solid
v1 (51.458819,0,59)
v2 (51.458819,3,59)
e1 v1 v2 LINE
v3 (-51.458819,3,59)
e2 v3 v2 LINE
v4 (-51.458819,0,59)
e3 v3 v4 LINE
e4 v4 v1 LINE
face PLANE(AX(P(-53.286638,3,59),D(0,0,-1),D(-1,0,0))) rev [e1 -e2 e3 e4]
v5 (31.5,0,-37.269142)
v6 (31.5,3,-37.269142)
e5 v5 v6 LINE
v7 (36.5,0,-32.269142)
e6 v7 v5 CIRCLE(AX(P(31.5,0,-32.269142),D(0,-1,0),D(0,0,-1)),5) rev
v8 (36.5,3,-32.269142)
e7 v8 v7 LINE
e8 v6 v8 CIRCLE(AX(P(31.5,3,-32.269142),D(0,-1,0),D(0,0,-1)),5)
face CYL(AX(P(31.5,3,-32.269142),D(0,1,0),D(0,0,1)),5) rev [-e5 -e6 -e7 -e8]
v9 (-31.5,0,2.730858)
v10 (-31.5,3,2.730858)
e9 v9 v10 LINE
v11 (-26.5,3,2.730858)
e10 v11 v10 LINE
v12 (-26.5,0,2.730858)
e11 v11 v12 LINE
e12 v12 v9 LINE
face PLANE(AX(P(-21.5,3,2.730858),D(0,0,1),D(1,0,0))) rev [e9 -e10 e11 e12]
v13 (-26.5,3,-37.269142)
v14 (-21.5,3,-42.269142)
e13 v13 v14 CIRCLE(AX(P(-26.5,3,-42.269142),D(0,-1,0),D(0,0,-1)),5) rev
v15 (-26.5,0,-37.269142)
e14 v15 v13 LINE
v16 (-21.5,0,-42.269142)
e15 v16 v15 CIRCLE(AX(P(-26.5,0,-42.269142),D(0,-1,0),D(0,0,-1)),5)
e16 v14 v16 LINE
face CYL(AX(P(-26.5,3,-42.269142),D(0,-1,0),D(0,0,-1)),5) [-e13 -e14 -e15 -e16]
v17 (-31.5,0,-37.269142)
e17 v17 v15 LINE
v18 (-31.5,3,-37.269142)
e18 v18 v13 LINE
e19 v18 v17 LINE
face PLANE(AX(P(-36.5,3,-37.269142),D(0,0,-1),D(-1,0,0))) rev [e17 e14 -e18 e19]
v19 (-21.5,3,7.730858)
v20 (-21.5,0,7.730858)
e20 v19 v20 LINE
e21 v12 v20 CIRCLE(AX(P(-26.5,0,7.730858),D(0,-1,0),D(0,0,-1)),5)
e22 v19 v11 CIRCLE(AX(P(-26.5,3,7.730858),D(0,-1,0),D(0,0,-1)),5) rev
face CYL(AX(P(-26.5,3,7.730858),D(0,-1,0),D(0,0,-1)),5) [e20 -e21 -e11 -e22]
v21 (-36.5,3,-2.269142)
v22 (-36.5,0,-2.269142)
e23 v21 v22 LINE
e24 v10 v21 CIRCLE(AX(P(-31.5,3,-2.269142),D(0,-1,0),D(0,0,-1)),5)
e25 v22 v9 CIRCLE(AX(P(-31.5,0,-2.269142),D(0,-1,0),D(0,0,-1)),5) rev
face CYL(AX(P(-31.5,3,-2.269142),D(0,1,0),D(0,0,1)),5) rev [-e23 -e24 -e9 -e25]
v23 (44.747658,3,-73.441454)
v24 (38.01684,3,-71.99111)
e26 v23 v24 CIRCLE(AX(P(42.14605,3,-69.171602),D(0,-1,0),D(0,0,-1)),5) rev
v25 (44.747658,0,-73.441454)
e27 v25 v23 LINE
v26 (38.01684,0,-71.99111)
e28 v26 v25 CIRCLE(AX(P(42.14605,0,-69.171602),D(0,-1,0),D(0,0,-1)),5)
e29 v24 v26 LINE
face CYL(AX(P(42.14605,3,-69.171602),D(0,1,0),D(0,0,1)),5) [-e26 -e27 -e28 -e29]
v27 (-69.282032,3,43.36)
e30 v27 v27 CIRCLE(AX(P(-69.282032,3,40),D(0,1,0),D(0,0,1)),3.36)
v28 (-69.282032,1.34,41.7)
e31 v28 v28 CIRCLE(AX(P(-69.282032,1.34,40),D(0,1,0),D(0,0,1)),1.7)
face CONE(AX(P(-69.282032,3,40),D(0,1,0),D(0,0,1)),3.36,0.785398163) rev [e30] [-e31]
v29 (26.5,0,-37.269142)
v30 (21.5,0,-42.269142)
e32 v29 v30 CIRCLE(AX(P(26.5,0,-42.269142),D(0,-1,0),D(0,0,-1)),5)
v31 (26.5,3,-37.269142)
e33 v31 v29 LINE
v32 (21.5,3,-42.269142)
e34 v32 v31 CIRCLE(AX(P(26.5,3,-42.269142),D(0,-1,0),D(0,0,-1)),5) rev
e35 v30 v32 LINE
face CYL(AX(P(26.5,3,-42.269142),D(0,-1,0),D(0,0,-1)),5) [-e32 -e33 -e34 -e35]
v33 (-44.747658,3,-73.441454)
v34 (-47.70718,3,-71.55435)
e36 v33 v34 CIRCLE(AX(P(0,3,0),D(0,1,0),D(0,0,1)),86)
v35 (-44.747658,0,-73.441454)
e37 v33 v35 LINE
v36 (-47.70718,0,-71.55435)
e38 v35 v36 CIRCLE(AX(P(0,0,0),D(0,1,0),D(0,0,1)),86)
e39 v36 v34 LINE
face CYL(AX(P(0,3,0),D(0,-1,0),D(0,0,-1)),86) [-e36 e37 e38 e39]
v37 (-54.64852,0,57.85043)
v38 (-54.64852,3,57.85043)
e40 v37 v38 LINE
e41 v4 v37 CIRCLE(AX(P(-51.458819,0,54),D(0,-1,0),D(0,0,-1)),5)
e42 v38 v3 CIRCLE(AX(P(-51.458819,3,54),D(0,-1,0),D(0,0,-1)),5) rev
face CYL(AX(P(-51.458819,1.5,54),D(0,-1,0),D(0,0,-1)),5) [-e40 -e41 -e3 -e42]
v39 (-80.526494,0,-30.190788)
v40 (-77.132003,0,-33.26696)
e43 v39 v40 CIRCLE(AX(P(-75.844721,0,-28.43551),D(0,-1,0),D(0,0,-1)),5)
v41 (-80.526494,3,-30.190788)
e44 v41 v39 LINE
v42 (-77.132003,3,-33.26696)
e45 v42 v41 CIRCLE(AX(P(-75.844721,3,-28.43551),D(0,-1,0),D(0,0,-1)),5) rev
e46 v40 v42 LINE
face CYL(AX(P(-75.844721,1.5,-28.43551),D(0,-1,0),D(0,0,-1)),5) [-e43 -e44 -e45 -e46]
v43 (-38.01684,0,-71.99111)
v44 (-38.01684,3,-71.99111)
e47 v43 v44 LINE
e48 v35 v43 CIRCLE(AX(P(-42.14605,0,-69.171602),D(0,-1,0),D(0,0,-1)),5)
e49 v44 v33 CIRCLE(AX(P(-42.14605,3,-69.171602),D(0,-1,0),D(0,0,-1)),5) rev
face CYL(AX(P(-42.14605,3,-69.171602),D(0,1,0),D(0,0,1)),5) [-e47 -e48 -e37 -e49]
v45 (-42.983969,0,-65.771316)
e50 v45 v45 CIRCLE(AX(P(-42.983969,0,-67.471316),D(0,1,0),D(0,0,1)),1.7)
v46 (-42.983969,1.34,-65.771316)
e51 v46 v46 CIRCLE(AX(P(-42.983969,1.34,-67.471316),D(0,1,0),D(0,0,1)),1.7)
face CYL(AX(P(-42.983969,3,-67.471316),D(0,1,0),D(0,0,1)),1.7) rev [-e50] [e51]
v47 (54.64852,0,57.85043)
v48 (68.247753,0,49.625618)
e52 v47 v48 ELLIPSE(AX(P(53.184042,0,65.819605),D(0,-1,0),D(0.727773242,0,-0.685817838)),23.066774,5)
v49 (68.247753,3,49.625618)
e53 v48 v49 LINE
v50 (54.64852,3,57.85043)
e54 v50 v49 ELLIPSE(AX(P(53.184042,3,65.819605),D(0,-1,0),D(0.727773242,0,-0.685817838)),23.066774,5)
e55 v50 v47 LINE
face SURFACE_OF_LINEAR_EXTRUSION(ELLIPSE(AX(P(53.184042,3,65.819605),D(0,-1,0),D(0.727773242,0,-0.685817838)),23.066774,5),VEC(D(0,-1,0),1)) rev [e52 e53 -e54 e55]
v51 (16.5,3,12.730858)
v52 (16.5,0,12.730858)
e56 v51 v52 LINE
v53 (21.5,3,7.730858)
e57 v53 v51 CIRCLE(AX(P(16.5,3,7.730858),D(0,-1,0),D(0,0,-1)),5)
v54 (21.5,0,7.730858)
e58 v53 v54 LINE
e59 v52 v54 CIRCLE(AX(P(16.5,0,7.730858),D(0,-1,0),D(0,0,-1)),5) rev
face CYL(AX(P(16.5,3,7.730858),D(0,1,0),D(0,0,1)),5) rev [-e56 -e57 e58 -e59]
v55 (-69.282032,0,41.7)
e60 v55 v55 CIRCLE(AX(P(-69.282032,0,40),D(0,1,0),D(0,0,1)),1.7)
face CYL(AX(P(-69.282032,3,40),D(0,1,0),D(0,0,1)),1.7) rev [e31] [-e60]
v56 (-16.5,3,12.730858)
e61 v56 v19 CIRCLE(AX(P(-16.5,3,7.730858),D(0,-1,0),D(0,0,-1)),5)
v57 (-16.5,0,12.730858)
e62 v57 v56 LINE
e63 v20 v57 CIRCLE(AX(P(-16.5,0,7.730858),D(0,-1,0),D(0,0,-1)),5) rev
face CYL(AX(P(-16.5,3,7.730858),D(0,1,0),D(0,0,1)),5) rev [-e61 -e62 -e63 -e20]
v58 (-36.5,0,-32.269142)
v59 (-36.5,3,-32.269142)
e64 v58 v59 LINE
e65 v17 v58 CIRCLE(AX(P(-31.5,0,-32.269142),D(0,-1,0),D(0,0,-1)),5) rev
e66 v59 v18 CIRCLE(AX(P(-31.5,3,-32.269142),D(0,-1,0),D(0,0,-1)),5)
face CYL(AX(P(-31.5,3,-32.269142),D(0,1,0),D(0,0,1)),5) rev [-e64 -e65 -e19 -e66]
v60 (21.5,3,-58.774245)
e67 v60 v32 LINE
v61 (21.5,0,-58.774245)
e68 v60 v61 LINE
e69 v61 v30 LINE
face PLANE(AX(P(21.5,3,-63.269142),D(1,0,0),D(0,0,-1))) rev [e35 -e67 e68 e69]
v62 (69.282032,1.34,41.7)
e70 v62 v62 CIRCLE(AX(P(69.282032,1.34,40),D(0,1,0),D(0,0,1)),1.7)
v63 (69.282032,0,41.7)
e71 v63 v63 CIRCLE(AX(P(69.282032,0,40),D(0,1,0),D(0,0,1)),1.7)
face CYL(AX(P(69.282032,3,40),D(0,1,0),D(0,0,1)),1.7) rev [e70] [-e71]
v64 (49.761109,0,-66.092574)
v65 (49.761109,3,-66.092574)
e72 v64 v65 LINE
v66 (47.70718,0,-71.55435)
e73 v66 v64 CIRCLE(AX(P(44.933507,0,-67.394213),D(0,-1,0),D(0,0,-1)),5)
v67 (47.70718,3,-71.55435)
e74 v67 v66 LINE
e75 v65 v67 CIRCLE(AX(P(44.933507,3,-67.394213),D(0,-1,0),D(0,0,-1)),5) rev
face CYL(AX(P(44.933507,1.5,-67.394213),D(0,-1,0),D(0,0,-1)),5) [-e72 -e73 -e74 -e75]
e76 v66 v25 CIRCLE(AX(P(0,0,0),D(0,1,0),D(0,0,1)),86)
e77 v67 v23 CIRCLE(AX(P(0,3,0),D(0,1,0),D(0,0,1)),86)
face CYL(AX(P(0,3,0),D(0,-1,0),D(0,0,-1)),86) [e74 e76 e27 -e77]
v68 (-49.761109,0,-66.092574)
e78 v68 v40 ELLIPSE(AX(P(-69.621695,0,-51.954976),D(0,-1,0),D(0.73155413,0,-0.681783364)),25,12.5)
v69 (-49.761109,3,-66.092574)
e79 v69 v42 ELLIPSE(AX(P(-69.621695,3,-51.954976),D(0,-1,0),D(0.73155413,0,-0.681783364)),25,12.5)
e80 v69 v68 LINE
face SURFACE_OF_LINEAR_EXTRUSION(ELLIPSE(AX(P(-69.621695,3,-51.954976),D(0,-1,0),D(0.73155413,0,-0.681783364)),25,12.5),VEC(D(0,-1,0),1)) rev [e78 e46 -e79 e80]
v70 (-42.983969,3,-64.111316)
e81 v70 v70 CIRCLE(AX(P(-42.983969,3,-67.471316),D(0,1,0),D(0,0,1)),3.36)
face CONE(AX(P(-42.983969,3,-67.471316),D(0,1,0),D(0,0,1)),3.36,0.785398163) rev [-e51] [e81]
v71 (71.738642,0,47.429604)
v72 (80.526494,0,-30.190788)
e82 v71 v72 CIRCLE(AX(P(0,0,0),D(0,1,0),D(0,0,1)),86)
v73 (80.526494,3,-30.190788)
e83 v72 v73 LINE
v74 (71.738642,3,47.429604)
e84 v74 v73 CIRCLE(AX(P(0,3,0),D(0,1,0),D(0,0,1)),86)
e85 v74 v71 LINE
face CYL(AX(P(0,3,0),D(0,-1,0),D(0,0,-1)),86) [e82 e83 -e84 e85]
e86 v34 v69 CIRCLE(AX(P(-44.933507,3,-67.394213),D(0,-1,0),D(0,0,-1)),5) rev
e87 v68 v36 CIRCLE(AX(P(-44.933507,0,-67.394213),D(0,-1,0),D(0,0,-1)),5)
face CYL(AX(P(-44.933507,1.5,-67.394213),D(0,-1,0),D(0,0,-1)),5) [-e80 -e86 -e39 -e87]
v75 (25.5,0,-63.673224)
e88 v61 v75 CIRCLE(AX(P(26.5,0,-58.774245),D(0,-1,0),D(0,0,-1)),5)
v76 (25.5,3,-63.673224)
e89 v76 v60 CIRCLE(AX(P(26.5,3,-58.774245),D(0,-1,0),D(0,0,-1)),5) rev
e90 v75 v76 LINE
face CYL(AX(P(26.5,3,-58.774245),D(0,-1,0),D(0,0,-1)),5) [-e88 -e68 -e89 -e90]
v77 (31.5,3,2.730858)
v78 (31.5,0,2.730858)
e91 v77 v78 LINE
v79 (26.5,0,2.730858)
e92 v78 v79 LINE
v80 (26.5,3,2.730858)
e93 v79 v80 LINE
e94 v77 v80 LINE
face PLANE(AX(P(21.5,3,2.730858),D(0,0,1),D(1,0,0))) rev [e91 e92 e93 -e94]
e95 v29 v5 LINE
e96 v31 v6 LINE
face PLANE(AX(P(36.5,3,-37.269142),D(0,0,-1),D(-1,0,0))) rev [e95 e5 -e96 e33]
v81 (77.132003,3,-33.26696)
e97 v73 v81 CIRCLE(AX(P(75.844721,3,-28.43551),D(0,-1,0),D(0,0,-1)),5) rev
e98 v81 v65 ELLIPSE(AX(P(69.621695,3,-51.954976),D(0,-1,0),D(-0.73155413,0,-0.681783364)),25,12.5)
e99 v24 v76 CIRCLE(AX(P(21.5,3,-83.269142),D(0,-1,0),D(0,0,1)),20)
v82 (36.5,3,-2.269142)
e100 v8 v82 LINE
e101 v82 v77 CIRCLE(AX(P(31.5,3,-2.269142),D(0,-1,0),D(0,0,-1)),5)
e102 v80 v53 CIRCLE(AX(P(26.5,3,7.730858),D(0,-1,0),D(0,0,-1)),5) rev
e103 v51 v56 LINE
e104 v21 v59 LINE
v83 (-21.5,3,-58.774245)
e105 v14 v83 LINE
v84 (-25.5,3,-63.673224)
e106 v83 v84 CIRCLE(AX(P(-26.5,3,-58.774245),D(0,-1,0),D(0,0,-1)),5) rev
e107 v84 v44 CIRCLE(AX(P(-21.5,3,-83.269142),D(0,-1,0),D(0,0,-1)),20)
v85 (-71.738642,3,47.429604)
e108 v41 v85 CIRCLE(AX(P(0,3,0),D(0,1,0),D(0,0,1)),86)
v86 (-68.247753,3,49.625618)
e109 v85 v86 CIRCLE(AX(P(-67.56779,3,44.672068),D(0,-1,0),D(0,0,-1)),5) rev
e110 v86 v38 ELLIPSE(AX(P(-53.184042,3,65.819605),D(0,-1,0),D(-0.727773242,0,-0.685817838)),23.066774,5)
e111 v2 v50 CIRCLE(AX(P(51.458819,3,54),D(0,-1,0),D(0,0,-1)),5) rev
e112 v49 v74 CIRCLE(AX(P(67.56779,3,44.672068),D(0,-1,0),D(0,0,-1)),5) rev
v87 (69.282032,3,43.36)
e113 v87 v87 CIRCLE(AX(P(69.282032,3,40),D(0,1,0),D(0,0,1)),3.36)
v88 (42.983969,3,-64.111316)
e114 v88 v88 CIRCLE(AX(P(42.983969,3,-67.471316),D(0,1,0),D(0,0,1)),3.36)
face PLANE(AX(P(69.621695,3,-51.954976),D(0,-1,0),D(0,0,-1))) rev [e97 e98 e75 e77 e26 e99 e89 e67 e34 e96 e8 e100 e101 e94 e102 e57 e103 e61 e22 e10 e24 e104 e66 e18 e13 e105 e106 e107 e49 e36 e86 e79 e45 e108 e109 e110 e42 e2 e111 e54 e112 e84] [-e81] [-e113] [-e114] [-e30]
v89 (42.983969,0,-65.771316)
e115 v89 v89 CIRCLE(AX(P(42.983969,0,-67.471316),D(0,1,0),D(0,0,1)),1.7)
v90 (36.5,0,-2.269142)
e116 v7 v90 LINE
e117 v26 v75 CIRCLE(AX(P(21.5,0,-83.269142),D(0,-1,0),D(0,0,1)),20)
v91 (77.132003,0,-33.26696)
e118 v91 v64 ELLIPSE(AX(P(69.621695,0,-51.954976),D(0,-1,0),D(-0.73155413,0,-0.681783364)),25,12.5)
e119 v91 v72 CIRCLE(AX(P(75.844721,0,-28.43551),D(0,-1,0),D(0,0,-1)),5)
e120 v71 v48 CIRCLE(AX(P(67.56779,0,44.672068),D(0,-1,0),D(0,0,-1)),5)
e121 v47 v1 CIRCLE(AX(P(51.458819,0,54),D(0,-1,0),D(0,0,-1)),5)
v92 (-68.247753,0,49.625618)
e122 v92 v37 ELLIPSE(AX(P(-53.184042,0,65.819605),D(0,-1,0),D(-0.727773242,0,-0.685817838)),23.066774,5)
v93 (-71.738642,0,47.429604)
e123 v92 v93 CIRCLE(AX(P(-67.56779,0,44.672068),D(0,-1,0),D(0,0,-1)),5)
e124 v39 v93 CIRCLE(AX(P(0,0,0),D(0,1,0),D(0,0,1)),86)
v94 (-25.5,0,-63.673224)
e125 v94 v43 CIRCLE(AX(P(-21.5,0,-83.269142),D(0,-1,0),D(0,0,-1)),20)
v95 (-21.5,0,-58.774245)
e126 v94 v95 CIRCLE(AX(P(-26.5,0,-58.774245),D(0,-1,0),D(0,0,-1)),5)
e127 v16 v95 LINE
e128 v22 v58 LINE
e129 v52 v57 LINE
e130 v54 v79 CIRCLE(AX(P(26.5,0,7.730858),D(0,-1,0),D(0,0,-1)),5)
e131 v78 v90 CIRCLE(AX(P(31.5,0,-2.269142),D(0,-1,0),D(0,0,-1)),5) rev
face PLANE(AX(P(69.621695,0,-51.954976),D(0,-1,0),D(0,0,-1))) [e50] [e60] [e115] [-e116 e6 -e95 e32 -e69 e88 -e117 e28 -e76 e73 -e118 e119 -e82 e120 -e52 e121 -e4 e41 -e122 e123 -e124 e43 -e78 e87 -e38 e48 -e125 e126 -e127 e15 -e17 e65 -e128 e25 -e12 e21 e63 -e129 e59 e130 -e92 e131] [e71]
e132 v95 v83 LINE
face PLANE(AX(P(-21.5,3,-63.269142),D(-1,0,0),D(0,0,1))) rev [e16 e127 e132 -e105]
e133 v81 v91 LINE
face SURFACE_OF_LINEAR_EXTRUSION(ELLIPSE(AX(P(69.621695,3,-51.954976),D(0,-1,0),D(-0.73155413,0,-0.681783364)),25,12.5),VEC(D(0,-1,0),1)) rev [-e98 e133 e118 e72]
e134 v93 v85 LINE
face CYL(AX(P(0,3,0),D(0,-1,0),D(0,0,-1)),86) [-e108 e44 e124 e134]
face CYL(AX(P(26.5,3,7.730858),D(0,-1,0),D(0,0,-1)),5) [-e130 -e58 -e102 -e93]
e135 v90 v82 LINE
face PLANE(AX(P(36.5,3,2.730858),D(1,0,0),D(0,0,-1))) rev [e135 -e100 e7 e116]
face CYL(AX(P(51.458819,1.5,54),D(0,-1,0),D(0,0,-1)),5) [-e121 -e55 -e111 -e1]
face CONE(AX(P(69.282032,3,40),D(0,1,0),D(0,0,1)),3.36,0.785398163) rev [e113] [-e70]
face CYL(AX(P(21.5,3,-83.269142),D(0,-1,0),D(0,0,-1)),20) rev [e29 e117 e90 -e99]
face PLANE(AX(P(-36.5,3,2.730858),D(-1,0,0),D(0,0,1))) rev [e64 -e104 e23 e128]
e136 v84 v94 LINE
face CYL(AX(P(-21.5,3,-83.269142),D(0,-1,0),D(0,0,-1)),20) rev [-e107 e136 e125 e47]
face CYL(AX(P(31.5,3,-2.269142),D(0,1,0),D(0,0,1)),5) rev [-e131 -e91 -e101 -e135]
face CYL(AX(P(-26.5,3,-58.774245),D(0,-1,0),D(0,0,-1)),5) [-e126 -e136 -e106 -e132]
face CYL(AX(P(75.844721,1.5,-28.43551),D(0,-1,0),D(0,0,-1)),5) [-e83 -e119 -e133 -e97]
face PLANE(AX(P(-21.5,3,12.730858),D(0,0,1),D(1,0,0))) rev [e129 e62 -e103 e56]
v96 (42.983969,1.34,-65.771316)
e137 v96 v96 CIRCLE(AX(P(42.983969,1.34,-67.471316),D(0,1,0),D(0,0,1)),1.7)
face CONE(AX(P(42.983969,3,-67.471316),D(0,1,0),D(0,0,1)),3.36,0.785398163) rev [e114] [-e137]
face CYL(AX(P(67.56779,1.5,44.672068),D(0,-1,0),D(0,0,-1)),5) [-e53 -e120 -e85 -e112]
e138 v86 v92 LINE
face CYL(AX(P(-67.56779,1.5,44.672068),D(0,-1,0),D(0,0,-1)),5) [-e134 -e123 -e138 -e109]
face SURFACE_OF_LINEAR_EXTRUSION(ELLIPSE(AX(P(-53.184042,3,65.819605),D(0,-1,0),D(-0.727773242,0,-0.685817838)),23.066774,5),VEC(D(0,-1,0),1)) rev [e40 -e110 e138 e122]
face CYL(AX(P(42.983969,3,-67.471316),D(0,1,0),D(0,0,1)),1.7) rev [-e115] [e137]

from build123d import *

# Parameters (mm, degrees)
RESSALTO_EXTRUS_O2_DEPTH            = 3
ESCAREADO_PARA_SFHCS_M31_AT_2_COUNT = 2
ESCAREADO_PARA_SFHCS_M31_AT_2_PITCH = 110.642088925
ESCAREADO_PARA_SFHCS_M31_AT_3_COUNT = 2
ESCAREADO_PARA_SFHCS_M31_AT_3_PITCH = 155.41473117
ESCAREADO_PARA_SFHCS_M31_AT_4_COUNT = 2
ESCAREADO_PARA_SFHCS_M31_AT_4_PITCH = 85.967937335
FILETE4_R                           = 5
FILETE6_R                           = 5
FILETE7_R                           = 5
FILETE8_R                           = 5


with BuildPart() as part:
    # Esboço3 → Ressalto-extrusão2 (new body)
    with BuildSketch(Plane(origin=(0, 0, 0), x_dir=(1, 0, 0), z_dir=(0, 1, 0))):
        with BuildLine():
            Line((-21.5, 63.269141943), (-21.5, 37.269141943))
            Line((-21.5, 37.269141943), (-36.5, 37.269141943))
            Line((-36.5, 37.269141943), (-36.5, -2.730858057))
            Line((-36.5, -2.730858057), (-21.5, -2.730858057))
            Line((-21.5, -2.730858057), (-21.5, -12.730858057))
            Line((-21.5, -12.730858057), (21.5, -12.730858057))
            Line((21.5, -12.730858057), (21.5, -2.730858057))
            Line((21.5, -2.730858057), (36.5, -2.730858057))
            Line((36.5, -2.730858057), (36.5, 37.269141943))
            Line((36.5, 37.269141943), (21.5, 37.269141943))
            Line((21.5, 37.269141943), (21.5, 63.269141943))
            ThreePointArc((21.5, 63.269141943), (32.805831499, 66.771318629), (40.152161049, 76.051324532))
            ThreePointArc((40.152161049, 76.051324532), (45.878189612, 72.740578208), (51.332841832, 68.999560502))
            add(Edge.make_bspline(
                [(51.332841832, 68.999560502), (24.845967814, 40.579122115), (79.509348747, 32.775958595)],
                knots=[0, 0, 0, 2.519003886, 2.519003886, 2.519003886], degree=2, weights=[1, 0.306291066, 1]))
            ThreePointArc((79.509348747, 32.775958595), (85.434712449, -9.844283047), (69.971422738, -50))
            add(Edge.make_bspline(
                [(69.971422738, -50), (67.189039214, -47.047402145), (53.286638173, -59)],
                knots=[3.141592654, 3.141592654, 3.141592654, 4.504907102, 4.504907102, 4.504907102], degree=2, weights=[1, 0.776529601, 1]))
            Line((53.286638173, -59), (-53.286638173, -59))
            add(Edge.make_bspline(
                [(-53.286638173, -59), (-67.189039214, -47.047402145), (-69.971422738, -50)],
                knots=[1.778278205, 1.778278205, 1.778278205, 3.141592654, 3.141592654, 3.141592654], degree=2, weights=[1, 0.776529601, 1]))
            ThreePointArc((-69.971422738, -50), (-85.434712449, -9.844283047), (-79.509348747, 32.775958595))
            add(Edge.make_bspline(
                [(-79.509348747, 32.775958595), (-24.845967814, 40.579122115), (-51.332841832, 68.999560502)],
                knots=[0.622588768, 0.622588768, 0.622588768, 3.141592654, 3.141592654, 3.141592654], degree=2, weights=[1, 0.306291066, 1]))
            ThreePointArc((-51.332841832, 68.999560502), (-45.878189612, 72.740578208), (-40.152161049, 76.051324532))
            ThreePointArc((-40.152161049, 76.051324532), (-32.805831499, 66.771318629), (-21.5, 63.269141943))
        make_face()
    extrude(amount=RESSALTO_EXTRUS_O2_DEPTH)

    # Esboço12 → Escareado para SFHCS M31 (revolve, cut)
    with BuildSketch(Plane(origin=(42.983968668, 3, -67.471315665), x_dir=(0, 0, 1), z_dir=(1, 0, 0))):
        Polygon((0, 0), (0, 3), (1.7, 3), (1.7, 1.66), (3.36, 0), align=None)
    escareado_para_sfhcs_m31 = revolve(axis=Axis((42.983968668, 9.35, -67.471315665), (0, -1, 0)), mode=Mode.SUBTRACT)

    # Escareado para SFHCS M31 at 2: Escareado para SFHCS M31 ×2
    with Locations(*[Vector(0.23768589232617374, 0, 0.9713420698132613) * (i * ESCAREADO_PARA_SFHCS_M31_AT_2_PITCH) for i in range(1, ESCAREADO_PARA_SFHCS_M31_AT_2_COUNT)]):
        add(escareado_para_sfhcs_m31, mode=Mode.SUBTRACT)

    # Escareado para SFHCS M31 at 3: Escareado para SFHCS M31 ×2
    with Locations(*[Vector(-0.7223639620597521, 0, 0.6915130557822732) * (i * ESCAREADO_PARA_SFHCS_M31_AT_3_PITCH) for i in range(1, ESCAREADO_PARA_SFHCS_M31_AT_3_COUNT)]):
        add(escareado_para_sfhcs_m31, mode=Mode.SUBTRACT)

    # Escareado para SFHCS M31 at 4: Escareado para SFHCS M31 ×2
    with Locations(*[(-i * ESCAREADO_PARA_SFHCS_M31_AT_4_PITCH, 0, 0) for i in range(1, ESCAREADO_PARA_SFHCS_M31_AT_4_COUNT)]):
        add(escareado_para_sfhcs_m31, mode=Mode.SUBTRACT)

    # Filete4
    filete4_edges = [part.edges().sort_by_distance(p)[0] for p in [
        (21.5, 1.5, -63.269141943),
        (40.152161049, 1.5, -76.051324532),
        (-40.152161049, 1.5, -76.051324532),
        (-21.5, 1.5, -63.269141943),
    ]]
    fillet(filete4_edges, radius=FILETE4_R)

    # Filete6
    filete6_edges = [part.edges().sort_by_distance(p)[0] for p in [
        (69.971422738, 1.5, 50),
        (53.286638173, 1.5, 59),
        (-53.286638173, 1.5, 59),
        (-69.971422738, 1.5, 50),
    ]]
    fillet(filete6_edges, radius=FILETE6_R)

    # Filete7
    filete7_edges = [part.edges().sort_by_distance(p)[0] for p in [
        (-21.5, 1.5, 12.730858057),
        (21.5, 1.5, 12.730858057),
        (21.5, 1.5, 2.730858057),
        (36.5, 1.5, 2.730858057),
        (36.5, 1.5, -37.269141943),
        (21.5, 1.5, -37.269141943),
        (-21.5, 1.5, -37.269141943),
        (-36.5, 1.5, -37.269141943),
        (-36.5, 1.5, 2.730858057),
        (-21.5, 1.5, 2.730858057),
    ]]
    fillet(filete7_edges, radius=FILETE7_R - 0.0001)  # a hair under: the kernel refuses the full size

    # Filete8
    filete8_edges = [part.edges().sort_by_distance(p)[0] for p in [
        (79.509348747, 1.5, -32.775958595),
        (51.332841832, 1.5, -68.999560502),
        (-79.509348747, 1.5, -32.775958595),
        (-51.332841832, 1.5, -68.999560502),
    ]]
    fillet(filete8_edges, radius=FILETE8_R)


solid = part.part
